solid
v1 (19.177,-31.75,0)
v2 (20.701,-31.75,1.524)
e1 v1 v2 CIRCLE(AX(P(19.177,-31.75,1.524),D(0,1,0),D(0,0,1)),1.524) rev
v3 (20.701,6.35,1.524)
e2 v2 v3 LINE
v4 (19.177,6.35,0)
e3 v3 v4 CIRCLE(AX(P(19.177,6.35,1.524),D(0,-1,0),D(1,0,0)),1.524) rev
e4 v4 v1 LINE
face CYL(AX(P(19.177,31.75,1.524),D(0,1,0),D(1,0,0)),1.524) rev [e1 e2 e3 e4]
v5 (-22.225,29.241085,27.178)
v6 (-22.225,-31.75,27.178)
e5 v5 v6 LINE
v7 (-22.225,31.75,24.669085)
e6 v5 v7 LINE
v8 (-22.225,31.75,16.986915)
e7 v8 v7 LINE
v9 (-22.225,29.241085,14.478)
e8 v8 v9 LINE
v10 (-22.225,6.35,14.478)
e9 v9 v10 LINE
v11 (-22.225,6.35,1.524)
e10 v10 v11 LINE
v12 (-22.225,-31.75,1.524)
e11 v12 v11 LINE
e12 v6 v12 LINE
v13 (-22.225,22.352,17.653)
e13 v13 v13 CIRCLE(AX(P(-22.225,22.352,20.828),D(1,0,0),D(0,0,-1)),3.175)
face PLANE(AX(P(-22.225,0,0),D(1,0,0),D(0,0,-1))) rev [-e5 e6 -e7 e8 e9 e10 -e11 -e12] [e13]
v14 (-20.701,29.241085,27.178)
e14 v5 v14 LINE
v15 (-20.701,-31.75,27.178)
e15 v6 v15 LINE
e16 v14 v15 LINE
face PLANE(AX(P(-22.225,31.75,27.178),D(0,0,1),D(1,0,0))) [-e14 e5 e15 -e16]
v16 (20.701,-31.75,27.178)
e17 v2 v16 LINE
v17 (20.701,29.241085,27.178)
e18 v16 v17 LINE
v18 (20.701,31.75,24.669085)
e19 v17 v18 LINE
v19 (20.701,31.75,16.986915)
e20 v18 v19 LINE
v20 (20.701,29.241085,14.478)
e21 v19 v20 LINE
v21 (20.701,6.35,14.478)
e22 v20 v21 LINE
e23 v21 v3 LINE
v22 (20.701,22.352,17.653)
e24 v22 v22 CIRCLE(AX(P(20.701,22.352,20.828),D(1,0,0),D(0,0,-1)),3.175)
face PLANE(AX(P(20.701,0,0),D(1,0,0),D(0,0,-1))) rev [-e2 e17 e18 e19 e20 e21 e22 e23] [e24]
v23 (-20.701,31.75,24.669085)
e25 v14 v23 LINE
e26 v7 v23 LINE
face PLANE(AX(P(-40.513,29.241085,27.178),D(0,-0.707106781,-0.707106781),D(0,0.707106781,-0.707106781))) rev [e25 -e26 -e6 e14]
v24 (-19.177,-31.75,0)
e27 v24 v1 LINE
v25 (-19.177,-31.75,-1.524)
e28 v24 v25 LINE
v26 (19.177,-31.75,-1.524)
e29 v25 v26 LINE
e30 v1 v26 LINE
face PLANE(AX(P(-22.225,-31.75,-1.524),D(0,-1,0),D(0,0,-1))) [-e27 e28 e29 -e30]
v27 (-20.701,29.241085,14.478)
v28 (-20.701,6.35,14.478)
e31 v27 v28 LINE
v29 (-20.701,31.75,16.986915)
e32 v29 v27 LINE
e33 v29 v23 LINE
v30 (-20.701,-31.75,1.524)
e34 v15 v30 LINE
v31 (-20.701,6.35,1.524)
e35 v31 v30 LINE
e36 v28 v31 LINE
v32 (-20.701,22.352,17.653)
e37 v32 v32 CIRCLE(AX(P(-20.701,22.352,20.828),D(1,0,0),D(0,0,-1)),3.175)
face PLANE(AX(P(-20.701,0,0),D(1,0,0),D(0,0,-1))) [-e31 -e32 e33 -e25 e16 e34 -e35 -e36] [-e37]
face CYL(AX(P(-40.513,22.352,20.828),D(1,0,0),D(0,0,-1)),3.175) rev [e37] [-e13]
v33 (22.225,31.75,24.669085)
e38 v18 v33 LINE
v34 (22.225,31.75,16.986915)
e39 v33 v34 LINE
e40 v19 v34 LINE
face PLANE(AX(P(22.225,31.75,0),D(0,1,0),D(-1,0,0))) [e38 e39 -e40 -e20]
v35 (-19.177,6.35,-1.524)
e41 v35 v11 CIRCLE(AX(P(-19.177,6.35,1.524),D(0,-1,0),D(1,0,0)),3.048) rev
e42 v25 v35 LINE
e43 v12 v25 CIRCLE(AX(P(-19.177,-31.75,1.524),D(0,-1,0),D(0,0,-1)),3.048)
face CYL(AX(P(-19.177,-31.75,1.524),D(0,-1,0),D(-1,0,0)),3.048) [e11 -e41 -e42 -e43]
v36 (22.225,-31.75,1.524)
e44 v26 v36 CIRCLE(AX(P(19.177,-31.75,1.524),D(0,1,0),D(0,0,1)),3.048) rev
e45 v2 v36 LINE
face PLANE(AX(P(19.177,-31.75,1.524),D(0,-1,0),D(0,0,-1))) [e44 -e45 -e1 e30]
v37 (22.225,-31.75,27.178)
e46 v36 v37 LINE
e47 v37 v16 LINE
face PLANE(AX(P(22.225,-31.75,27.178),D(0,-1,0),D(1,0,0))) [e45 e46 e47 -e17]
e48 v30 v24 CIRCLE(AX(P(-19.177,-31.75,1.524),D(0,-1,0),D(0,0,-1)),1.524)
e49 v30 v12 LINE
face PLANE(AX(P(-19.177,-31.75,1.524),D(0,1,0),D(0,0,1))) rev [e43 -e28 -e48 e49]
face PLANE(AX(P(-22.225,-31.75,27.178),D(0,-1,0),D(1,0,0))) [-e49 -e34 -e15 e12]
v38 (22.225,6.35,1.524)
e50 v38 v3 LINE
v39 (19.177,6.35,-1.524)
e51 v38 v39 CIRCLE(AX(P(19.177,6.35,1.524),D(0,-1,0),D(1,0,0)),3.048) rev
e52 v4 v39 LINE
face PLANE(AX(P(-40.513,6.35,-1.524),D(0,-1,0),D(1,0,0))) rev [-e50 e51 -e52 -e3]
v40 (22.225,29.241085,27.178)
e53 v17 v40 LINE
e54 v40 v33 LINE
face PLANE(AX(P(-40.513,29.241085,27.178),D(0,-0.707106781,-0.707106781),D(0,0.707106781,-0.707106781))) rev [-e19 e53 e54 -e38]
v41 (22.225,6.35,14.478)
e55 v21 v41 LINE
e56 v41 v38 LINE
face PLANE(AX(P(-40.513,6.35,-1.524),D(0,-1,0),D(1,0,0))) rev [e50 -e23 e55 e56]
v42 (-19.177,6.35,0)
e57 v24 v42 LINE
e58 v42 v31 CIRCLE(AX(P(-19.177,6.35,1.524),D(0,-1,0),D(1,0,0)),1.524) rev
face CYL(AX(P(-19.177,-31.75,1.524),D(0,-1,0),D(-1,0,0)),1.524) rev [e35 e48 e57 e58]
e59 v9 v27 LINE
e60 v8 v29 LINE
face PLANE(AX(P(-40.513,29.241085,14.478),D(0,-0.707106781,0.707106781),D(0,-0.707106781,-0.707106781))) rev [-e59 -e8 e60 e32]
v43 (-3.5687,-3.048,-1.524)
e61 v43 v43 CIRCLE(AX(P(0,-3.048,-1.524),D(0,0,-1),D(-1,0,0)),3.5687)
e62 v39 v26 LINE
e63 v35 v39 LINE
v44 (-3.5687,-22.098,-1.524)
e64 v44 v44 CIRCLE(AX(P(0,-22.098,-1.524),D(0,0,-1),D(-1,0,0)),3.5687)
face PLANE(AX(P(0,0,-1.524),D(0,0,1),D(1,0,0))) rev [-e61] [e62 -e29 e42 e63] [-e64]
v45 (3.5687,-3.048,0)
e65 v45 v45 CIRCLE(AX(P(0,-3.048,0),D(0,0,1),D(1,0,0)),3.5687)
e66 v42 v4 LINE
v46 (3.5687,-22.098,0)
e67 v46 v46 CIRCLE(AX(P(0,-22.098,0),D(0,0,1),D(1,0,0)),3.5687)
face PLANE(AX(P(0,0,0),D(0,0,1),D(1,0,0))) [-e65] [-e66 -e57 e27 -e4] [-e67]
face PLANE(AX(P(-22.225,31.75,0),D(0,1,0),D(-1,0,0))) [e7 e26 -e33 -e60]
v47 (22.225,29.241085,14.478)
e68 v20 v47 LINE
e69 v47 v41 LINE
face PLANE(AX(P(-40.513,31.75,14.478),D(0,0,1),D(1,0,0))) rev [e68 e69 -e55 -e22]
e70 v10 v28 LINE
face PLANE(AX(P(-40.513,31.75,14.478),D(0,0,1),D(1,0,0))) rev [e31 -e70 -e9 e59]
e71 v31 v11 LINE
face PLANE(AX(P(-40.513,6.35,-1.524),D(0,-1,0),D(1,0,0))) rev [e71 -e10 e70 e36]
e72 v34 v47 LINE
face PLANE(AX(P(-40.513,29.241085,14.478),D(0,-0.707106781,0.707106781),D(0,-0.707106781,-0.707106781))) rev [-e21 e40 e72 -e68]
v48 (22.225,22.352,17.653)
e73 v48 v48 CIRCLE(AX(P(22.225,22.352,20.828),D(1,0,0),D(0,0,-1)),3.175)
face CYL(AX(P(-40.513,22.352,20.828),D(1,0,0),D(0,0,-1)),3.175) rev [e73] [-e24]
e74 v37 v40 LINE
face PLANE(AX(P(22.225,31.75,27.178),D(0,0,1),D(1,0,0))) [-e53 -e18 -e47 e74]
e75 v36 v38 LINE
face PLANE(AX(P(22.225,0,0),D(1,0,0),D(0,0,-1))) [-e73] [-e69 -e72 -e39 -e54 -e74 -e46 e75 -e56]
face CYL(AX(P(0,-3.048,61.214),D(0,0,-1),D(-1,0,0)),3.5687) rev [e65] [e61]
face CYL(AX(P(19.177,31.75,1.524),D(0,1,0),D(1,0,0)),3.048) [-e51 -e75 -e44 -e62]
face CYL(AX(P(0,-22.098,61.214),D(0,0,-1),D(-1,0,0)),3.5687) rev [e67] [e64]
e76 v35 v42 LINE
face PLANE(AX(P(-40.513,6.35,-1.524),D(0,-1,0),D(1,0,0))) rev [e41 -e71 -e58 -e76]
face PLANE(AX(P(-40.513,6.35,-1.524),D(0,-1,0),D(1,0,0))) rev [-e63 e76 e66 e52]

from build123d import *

# Parameters (mm, degrees)
CROQUIS1_W                         = 44.45
CROQUIS1_H                         = 63.5
BRIDA_BASE1_DEPTH                  = 1.524
BRIDA_DE_ARISTA1_STRIP_W           = 9.144
BRIDA_DE_ARISTA1_STRIP_H           = 1.524
BRIDA_DE_ARISTA1_STRIP_CUT_DEPTH   = 63.5
BRIDA_DE_ARISTA1_STRIP_2_W         = 9.144
BRIDA_DE_ARISTA1_STRIP_2_H         = 1.524
BRIDA_DE_ARISTA1_STRIP_CUT_2_DEPTH = 63.5
BRIDA_DE_ARISTA1_DEPTH             = 63.5
BRIDA_DE_ARISTA1_BEND_DEPTH        = 63.5
CROQUIS12_R                        = 3.175
CROQUIS12_W                        = 16.002
CROQUIS12_H                        = 25.4
CORTAR_EXTRUIR1_DEPTH              = 62.738
CROQUIS13_R                        = 3.5687
CORTAR_EXTRUIR2_DEPTH              = 62.738
CORTAR_EXTRUIR3_DEPTH              = 62.738


# Sheet-metal steps are written as plain solids
with BuildPart() as part:
    # Croquis1 → Brida base1 (new body)
    with BuildSketch(Plane.XY):
        Rectangle(CROQUIS1_W, CROQUIS1_H)
    extrude(amount=-BRIDA_BASE1_DEPTH)

    # Brida de arista1 strip (across the edge) → Brida de arista1 strip cut (cut)
    with BuildSketch(Plane(origin=(22.225, -31.75, 0), x_dir=(-1, 0, 0), z_dir=(0, 1, 0))):
        with Locations((-1.524, -0.762)):
            Rectangle(BRIDA_DE_ARISTA1_STRIP_W, BRIDA_DE_ARISTA1_STRIP_H)
    extrude(amount=BRIDA_DE_ARISTA1_STRIP_CUT_DEPTH, mode=Mode.SUBTRACT)

    # Brida de arista1 strip 2 (across the edge) → Brida de arista1 strip cut 2 (cut)
    with BuildSketch(Plane(origin=(-22.225, 31.75, 0), x_dir=(1, 0, 0), z_dir=(0, -1, 0))):
        with Locations((-1.524, -0.762)):
            Rectangle(BRIDA_DE_ARISTA1_STRIP_2_W, BRIDA_DE_ARISTA1_STRIP_2_H)
    extrude(amount=BRIDA_DE_ARISTA1_STRIP_CUT_2_DEPTH, mode=Mode.SUBTRACT)

    # Brida de arista1 section (across the edge) → Brida de arista1 (add)
    with BuildSketch(Plane(origin=(22.225, -31.75, 0), x_dir=(-1, 0, 0), z_dir=(0, 1, 0))):
        with BuildLine():
            Line((0, 1.524), (0, 27.178))
            Line((0, 27.178), (1.524, 27.178))
            Line((1.524, 27.178), (1.524, 1.524))
            ThreePointArc((1.524, 1.524), (1.970369265, 0.446369265), (3.048, 0))
            Line((3.048, 0), (3.048, -1.524))
            ThreePointArc((3.048, -1.524), (0.892738531, -0.631261469), (0, 1.524))
        make_face()
    extrude(amount=BRIDA_DE_ARISTA1_DEPTH)

    # Brida de arista1 section 2 (across the edge) → Brida de arista1 bend (add)
    with BuildSketch(Plane(origin=(-22.225, 31.75, 0), x_dir=(1, 0, 0), z_dir=(0, -1, 0))):
        with BuildLine():
            Line((0, 1.524), (0, 27.178))
            Line((0, 27.178), (1.524, 27.178))
            Line((1.524, 27.178), (1.524, 1.524))
            ThreePointArc((1.524, 1.524), (1.970369265, 0.446369265), (3.048, 0))
            Line((3.048, 0), (3.048, -1.524))
            ThreePointArc((3.048, -1.524), (0.892738531, -0.631261469), (0, 1.524))
        make_face()
    extrude(amount=BRIDA_DE_ARISTA1_BEND_DEPTH)

    # Croquis12 → Cortar-Extruir1 (cut)
    with BuildSketch(Plane(origin=(22.225, 0, 0), x_dir=(0, 0, -1), z_dir=(1, 0, 0))):
        with Locations((-20.828, 22.352)):
            Circle(CROQUIS12_R)
        with Locations((-6.477, 19.05)):
            Rectangle(CROQUIS12_W, CROQUIS12_H)
    extrude(amount=-CORTAR_EXTRUIR1_DEPTH, mode=Mode.SUBTRACT)

    # Croquis13 → Cortar-Extruir2 (cut)
    with BuildSketch(Plane(origin=(0, 0, -1.524), x_dir=(-1, 0, 0), z_dir=(0, 0, -1))):
        with Locations((0, -22.098)):
            Circle(CROQUIS13_R)
        with Locations((0, -3.048)):
            Circle(CROQUIS13_R)
    extrude(amount=-CORTAR_EXTRUIR2_DEPTH, mode=Mode.SUBTRACT)

    # Croquis14 → Cortar-Extruir3 (cut)
    with BuildSketch(Plane(origin=(22.225, 0, 0), x_dir=(0, 0, -1), z_dir=(1, 0, 0))):
        Polygon((-14.478, 31.75), (-16.986914912, 31.75), (-14.478, 29.241085088), align=None)
        Polygon((-27.178, 31.75), (-24.669085088, 31.75), (-27.178, 29.241085088), align=None)
    extrude(amount=-CORTAR_EXTRUIR3_DEPTH, mode=Mode.SUBTRACT)


solid = part.part
